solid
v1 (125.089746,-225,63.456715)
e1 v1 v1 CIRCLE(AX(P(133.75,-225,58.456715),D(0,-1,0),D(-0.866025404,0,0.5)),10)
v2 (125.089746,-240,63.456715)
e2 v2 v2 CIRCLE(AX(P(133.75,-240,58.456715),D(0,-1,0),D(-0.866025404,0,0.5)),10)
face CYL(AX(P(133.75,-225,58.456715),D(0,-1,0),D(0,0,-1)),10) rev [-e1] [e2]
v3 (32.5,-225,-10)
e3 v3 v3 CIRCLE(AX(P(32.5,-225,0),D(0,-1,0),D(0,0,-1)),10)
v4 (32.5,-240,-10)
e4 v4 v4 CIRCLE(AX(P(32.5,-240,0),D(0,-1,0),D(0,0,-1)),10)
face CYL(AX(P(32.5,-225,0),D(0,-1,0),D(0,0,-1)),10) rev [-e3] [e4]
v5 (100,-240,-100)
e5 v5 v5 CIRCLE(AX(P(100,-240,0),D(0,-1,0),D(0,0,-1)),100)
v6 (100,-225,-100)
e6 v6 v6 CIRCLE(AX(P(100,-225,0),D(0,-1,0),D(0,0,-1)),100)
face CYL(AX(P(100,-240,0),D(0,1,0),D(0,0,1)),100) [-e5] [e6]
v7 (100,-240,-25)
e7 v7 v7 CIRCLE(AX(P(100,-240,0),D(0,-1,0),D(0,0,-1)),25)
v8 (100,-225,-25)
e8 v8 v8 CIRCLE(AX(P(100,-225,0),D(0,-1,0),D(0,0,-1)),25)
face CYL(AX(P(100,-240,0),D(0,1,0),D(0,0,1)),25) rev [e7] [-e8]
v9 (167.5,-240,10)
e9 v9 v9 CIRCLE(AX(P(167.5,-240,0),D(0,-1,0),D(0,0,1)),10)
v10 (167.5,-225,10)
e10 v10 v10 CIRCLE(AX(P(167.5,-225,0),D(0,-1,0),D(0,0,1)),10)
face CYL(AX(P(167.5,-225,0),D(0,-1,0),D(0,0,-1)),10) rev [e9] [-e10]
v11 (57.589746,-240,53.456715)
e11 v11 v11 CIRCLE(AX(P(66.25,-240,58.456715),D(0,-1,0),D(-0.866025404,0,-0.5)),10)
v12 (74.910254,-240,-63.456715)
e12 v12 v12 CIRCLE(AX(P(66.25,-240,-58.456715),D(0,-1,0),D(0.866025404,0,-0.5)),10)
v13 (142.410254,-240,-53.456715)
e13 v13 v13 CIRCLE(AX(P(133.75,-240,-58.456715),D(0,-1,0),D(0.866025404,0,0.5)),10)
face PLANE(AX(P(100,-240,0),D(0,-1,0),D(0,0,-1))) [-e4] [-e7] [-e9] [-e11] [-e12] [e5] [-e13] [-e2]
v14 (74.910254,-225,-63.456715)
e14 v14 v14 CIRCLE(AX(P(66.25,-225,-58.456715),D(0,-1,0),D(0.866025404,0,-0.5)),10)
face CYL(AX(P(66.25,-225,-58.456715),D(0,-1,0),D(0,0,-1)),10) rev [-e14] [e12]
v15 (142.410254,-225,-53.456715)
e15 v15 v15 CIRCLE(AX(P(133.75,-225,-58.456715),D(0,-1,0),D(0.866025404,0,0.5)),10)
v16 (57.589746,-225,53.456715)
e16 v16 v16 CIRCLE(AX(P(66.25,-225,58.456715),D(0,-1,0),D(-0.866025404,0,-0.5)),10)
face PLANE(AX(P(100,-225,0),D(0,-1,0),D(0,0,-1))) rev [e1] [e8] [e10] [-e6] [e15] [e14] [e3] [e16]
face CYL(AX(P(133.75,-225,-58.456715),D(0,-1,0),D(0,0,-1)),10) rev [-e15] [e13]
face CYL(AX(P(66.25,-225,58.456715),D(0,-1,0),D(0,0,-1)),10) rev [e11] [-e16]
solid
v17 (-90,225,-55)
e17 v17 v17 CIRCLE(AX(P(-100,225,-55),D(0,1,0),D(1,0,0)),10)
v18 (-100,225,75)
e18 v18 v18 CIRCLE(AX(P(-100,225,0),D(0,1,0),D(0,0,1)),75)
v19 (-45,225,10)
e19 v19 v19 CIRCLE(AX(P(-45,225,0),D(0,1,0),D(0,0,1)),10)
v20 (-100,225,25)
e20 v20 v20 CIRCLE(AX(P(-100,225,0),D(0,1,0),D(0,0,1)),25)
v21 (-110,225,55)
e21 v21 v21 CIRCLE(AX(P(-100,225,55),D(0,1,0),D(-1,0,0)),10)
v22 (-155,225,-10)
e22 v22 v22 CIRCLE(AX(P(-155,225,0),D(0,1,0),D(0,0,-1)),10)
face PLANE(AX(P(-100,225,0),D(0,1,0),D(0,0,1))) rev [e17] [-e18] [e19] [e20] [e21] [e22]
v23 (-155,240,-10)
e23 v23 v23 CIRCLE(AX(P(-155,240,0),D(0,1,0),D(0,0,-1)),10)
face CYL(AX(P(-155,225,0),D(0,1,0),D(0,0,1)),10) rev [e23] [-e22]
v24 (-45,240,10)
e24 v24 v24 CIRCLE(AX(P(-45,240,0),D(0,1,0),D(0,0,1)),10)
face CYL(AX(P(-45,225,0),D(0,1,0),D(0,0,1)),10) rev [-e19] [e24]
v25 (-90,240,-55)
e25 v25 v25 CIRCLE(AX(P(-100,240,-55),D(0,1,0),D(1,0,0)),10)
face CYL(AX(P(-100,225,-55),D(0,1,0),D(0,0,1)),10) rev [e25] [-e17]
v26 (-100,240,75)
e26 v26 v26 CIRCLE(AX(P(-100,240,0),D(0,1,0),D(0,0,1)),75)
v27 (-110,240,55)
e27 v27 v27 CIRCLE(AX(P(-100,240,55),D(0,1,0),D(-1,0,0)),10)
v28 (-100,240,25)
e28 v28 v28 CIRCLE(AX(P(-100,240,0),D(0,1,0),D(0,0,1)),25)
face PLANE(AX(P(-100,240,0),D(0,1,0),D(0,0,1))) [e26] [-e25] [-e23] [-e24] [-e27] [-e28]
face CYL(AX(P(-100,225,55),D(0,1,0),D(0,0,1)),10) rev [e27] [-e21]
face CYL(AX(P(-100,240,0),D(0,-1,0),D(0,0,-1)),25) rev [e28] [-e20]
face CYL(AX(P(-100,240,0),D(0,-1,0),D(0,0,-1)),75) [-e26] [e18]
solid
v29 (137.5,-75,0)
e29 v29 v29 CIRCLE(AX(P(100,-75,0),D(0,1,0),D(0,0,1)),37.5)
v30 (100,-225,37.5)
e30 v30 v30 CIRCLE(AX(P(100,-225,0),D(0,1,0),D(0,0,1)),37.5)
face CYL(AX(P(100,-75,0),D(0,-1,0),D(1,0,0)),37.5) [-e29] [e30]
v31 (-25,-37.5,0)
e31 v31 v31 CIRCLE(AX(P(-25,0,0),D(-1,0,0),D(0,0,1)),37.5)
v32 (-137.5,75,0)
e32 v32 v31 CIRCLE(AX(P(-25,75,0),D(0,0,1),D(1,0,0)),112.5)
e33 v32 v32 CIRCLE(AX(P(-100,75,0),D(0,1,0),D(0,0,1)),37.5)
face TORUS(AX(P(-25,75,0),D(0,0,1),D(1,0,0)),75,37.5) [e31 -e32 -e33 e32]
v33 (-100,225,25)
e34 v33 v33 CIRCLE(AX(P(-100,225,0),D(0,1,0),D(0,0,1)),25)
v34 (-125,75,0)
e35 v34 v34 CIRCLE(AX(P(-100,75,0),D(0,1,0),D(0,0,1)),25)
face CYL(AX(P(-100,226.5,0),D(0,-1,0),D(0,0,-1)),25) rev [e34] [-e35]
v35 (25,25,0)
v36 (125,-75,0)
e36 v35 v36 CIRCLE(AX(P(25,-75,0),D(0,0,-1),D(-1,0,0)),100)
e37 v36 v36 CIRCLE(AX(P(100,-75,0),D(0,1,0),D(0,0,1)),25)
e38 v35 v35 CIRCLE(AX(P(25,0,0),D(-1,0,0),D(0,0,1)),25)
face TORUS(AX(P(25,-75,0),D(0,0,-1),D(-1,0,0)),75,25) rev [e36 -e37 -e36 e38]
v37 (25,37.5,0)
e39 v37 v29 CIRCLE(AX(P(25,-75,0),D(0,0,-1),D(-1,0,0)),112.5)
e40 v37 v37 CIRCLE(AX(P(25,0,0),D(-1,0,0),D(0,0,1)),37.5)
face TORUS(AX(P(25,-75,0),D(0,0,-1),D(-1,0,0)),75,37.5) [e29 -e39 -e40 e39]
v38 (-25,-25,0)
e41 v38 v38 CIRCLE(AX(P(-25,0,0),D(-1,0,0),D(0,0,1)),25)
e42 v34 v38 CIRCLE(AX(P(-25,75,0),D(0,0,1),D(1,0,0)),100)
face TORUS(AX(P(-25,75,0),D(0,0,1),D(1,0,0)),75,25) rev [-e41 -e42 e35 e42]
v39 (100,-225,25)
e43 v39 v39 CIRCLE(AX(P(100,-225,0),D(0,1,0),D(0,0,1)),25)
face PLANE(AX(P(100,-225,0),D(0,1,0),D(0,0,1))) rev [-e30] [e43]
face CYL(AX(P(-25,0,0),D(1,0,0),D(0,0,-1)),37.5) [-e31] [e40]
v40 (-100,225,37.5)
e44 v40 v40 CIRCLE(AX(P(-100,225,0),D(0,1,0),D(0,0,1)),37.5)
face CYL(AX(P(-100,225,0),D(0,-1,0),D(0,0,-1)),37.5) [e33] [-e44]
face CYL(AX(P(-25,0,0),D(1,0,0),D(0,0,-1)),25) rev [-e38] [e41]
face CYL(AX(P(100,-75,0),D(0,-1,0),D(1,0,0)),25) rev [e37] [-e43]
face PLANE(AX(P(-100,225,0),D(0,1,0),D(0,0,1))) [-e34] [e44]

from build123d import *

# Parameters (mm, degrees)
SWEEP1_PROFILE_R     = 37.5
CUT_SWEEP1_PROFILE_R = 25
SKETCH27_R           = 75
SKETCH27_R_2         = 25
BOSS_EXTRUDE3_DEPTH  = 15
SKETCH25_R           = 100
SKETCH25_R_2         = 25
BOSS_EXTRUDE4_DEPTH  = 15
HOLE1_START          = -240
HOLE1_OUTLINE_R      = 10
HOLE1_DEPTH          = 15
CIRPATTERN1_COUNT    = 6
HOLE2_START          = 225
HOLE2_OUTLINE_R      = 10
HOLE2_DEPTH          = 15
CIRPATTERN2_COUNT    = 4


# Read off the part's stored shape, not the designer's step: Hole1, Hole2
with BuildPart() as part:
    # Sweep1: sweep along a path in Sketch1
    with BuildLine(Plane.XY) as sweep1_path:
        Line((-100, 225), (-100, 75))
        ThreePointArc((-100, 75), (-78.033008589, 21.966991411), (-25, 0))
        Line((-25, 0), (25, 0))
        ThreePointArc((25, 0), (78.033008589, -21.966991411), (100, -75))
        Line((100, -75), (100, -225))
    # Sweep1 profile (on start of the path) → Sweep1 (sweep)
    with BuildSketch(Plane(origin=(-100, 225, 0), x_dir=(0, 0, -1), z_dir=(0, -1, 0))):
        Circle(SWEEP1_PROFILE_R)
    sweep(path=sweep1_path.line)

    # Cut-Sweep1: sweep along a path in Sketch1<4>
    with BuildLine(Plane.XY) as cut_sweep1_path:
        Line((-100, 225), (-100, 75))
        ThreePointArc((-100, 75), (-78.033008589, 21.966991411), (-25, 0))
        Line((-25, 0), (25, 0))
        ThreePointArc((25, 0), (78.033008589, -21.966991411), (100, -75))
        Line((100, -75), (100, -225))
    # Cut-Sweep1 profile (on start of the path) → Cut-Sweep1 (sweep, cut)
    with BuildSketch(Plane(origin=(-100, 225, 0), x_dir=(0, 0, -1), z_dir=(0, -1, 0))):
        Circle(CUT_SWEEP1_PROFILE_R)
    sweep(path=cut_sweep1_path.line, mode=Mode.SUBTRACT)


with BuildPart() as body_2:
    # Sketch27 → Boss-Extrude3 (new body)
    with BuildSketch(Plane(origin=(0, 225, 0), x_dir=(1, 0, 0), z_dir=(0, 1, 0))):
        with Locations(Location((-100, 0, 0), (0, 0, 270))):
            Circle(SKETCH27_R)
        with Locations(Location((-100, 0, 0), (0, 0, 270))):
            Circle(SKETCH27_R_2, mode=Mode.SUBTRACT)
    extrude(amount=BOSS_EXTRUDE3_DEPTH)

    # Hole2 outline → Hole2 (cut)
    with BuildSketch(Plane(origin=(0, 0, 0), x_dir=(1, 0, 0), z_dir=(0, 1, 0)).offset(HOLE2_START)):
        with Locations((-45, 0)):
            Circle(HOLE2_OUTLINE_R)
    hole2 = extrude(amount=HOLE2_DEPTH, mode=Mode.SUBTRACT)

    # CirPattern2: Hole2 ×4 about axis
    cirpattern2_axis = Axis((-100, 0, 0), (0, 1, 0))
    for i in range(1, CIRPATTERN2_COUNT):
        add(hole2.rotate(cirpattern2_axis, i * 360 / CIRPATTERN2_COUNT), mode=Mode.SUBTRACT)


with BuildPart() as body_3:
    # Sketch25 → Boss-Extrude4 (new body)
    with BuildSketch(Plane.XZ.offset(225)):
        with Locations(Location((100, 0, 0), (0, 0, 270))):
            Circle(SKETCH25_R)
        with Locations(Location((100, 0, 0), (0, 0, 270))):
            Circle(SKETCH25_R_2, mode=Mode.SUBTRACT)
    extrude(amount=BOSS_EXTRUDE4_DEPTH)

    # Hole1 outline → Hole1 (cut)
    with BuildSketch(Plane(origin=(0, 0, 0), x_dir=(1, 0, 0), z_dir=(0, 1, 0)).offset(HOLE1_START)):
        with Locations((32.5, 0)):
            Circle(HOLE1_OUTLINE_R)
    hole1 = extrude(amount=HOLE1_DEPTH, mode=Mode.SUBTRACT)

    # CirPattern1: Hole1 ×6 about axis
    cirpattern1_axis = Axis((100, 0, 0), (0, 1, 0))
    for i in range(1, CIRPATTERN1_COUNT):
        add(hole1.rotate(cirpattern1_axis, i * 360 / CIRPATTERN1_COUNT), mode=Mode.SUBTRACT)


solid = Compound([part.part, body_2.part, body_3.part])
